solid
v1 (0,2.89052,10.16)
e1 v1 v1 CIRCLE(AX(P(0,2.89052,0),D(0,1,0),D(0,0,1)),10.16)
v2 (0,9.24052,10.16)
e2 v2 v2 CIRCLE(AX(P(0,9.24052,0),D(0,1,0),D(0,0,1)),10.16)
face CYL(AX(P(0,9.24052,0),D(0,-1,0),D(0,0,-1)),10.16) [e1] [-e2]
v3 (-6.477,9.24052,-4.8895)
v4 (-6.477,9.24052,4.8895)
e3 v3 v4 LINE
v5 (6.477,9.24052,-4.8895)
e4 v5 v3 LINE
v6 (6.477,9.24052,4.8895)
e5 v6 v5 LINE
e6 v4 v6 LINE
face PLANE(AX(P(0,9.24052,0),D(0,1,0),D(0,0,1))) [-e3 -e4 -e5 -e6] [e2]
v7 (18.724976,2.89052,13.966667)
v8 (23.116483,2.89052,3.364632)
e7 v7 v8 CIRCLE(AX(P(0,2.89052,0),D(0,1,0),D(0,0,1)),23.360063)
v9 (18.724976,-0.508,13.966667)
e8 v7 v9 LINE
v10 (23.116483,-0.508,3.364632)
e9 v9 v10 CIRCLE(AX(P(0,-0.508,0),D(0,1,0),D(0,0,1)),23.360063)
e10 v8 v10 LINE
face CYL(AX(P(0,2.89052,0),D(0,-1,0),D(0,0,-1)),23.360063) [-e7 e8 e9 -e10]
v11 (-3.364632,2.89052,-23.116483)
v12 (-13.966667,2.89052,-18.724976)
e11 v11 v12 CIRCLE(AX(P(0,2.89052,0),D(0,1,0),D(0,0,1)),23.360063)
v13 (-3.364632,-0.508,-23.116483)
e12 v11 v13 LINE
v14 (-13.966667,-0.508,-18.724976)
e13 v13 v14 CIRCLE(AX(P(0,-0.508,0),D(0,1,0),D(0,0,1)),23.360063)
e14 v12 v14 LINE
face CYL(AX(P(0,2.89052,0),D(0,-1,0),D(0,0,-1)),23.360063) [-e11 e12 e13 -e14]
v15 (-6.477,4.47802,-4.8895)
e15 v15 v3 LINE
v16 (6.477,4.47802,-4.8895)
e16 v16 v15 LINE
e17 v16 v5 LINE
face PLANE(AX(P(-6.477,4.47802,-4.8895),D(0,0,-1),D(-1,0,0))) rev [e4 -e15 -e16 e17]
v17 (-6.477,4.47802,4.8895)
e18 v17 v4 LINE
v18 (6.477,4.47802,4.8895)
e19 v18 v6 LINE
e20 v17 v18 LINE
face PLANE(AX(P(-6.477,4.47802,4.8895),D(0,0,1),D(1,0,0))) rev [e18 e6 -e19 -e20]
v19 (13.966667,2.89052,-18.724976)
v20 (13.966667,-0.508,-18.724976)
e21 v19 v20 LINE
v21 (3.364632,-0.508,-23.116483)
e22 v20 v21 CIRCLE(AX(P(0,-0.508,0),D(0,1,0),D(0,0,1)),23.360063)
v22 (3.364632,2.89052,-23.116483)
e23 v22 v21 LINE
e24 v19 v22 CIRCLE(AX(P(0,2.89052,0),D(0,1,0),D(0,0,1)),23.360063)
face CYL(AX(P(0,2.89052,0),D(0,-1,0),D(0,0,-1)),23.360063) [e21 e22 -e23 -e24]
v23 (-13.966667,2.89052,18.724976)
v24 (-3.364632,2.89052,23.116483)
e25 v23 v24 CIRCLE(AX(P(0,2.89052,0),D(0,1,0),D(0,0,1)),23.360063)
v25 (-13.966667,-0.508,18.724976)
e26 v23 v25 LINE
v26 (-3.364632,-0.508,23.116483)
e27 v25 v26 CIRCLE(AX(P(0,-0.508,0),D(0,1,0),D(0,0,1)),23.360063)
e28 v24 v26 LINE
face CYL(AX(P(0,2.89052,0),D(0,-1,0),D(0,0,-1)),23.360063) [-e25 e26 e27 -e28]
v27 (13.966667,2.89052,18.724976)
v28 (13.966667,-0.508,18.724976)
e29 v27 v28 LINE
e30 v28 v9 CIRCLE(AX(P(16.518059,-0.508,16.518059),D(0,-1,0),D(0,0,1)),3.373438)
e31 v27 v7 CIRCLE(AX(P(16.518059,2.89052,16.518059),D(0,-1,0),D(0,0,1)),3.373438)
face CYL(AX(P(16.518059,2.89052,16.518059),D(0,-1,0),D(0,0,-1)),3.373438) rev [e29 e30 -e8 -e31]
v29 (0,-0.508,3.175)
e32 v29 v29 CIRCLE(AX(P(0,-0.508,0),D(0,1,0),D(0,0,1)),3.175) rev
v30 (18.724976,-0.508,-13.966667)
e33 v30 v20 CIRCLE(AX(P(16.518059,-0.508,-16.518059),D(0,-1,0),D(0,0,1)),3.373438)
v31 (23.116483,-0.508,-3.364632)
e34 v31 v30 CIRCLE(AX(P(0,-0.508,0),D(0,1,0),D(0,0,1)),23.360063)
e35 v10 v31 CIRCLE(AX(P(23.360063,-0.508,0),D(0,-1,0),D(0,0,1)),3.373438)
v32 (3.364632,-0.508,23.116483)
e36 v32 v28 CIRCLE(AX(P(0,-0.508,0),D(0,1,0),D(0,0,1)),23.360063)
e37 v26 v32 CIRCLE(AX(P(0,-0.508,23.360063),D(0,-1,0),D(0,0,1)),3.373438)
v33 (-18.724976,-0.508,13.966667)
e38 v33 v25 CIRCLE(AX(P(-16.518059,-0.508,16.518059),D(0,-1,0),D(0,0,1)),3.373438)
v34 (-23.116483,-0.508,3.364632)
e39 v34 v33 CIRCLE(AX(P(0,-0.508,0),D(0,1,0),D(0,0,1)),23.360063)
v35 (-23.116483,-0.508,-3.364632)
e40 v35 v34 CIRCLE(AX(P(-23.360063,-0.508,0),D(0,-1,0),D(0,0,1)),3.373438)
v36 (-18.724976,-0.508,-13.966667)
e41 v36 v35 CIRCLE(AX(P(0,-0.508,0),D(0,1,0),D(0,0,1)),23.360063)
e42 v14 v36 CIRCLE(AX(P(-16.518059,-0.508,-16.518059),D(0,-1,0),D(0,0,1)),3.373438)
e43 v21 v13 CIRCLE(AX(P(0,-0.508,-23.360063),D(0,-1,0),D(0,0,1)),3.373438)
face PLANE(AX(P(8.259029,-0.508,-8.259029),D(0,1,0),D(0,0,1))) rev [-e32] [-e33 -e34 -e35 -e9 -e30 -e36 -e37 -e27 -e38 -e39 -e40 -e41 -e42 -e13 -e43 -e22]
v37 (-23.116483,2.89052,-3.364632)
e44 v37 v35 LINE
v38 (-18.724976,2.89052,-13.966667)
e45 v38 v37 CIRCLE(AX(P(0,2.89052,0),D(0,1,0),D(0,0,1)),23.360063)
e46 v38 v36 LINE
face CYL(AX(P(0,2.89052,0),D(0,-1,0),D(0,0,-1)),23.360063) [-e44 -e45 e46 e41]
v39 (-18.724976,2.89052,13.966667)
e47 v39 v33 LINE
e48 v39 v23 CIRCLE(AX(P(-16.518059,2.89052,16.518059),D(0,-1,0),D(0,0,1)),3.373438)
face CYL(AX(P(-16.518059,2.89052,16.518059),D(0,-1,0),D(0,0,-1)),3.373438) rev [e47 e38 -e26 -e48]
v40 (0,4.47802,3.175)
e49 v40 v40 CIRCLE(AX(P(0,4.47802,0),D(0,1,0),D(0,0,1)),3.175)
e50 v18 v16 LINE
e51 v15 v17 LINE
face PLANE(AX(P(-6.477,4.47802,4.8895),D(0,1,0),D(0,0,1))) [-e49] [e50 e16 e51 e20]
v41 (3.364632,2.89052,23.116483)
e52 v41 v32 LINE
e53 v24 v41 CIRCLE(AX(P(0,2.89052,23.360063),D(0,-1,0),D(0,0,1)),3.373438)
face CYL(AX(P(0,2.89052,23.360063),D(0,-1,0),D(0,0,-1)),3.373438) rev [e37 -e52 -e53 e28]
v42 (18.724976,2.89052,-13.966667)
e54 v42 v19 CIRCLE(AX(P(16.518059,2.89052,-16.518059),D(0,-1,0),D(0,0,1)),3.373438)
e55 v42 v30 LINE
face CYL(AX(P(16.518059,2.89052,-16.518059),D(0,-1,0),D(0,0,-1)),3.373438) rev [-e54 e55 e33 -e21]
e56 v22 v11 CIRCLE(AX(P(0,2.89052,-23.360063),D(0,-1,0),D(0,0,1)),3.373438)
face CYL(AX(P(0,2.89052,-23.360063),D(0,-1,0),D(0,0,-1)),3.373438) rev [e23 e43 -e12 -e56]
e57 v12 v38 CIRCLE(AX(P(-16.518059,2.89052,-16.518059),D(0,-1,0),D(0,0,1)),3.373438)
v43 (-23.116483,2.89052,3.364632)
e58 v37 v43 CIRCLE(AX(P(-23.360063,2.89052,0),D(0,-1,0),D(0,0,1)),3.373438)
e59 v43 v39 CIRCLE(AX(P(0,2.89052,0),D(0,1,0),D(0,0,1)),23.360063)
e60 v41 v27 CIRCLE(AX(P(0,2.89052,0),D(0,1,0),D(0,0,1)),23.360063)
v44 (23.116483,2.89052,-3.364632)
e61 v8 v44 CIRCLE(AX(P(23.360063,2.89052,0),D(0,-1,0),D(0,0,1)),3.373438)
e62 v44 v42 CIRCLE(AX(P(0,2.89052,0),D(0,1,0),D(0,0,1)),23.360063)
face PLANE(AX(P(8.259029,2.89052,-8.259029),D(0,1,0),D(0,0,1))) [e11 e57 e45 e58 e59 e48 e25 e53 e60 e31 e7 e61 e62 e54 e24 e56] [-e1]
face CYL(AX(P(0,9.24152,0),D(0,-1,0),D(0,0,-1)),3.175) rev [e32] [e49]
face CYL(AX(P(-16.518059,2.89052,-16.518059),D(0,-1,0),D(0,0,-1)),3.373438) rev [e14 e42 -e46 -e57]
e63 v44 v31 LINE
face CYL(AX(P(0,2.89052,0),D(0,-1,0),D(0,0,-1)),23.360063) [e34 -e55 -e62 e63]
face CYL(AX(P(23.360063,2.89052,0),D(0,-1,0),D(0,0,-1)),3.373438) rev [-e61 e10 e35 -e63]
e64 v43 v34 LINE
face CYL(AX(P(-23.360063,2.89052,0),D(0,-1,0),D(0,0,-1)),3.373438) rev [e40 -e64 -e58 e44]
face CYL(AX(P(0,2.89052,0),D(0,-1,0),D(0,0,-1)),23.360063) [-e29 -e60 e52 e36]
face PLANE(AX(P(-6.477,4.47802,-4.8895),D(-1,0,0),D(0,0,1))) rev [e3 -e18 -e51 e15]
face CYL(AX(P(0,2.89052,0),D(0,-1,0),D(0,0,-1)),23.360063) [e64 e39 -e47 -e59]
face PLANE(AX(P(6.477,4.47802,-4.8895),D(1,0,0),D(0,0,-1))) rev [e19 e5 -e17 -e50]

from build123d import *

# Parameters (mm, degrees)
EXTRUDE1_DEPTH      = 2.89052
EXTRUDE1_DEPTH_BACK = 0.508
SKETCH5_R           = 10.16
EXTRUDE2_DEPTH      = 6.35
CUT_EXTRUDE1_START  = -0.508
SKETCH3_R           = 3.175
CUT_EXTRUDE1_DEPTH  = 9.74852
SPLIT1_START        = -6.477
SPLIT1_OUTLINE_W    = 4.7625
SPLIT1_OUTLINE_H    = 9.779
SPLIT1_DEPTH        = 12.954


# Read off the part's stored shape, not the designer's step: Split1
with BuildPart() as part:
    # Sketch1 → Extrude1 (new, two sides: drawn at the far end of the back side and taken through both)
    with BuildSketch(Plane(origin=(0, 0, 0), x_dir=(1, 0, 0), z_dir=(0, 1, 0)).offset(-EXTRUDE1_DEPTH_BACK)):
        with BuildLine():
            ThreePointArc((-3.364632139, 23.11648266), (-8.939508898, 21.581883622), (-13.966667445, 18.724975848))
            ThreePointArc((-13.966667445, 18.724975848), (-14.132678071, 14.132678071), (-18.724975848, 13.966667445))
            ThreePointArc((-18.724975848, 13.966667445), (-21.581883622, 8.939508898), (-23.11648266, 3.364632139))
            ThreePointArc((-23.11648266, 3.364632139), (-19.986625, 0), (-23.11648266, -3.364632139))
            ThreePointArc((-23.11648266, -3.364632139), (-21.581883622, -8.939508898), (-18.724975848, -13.966667445))
            ThreePointArc((-18.724975848, -13.966667445), (-14.132678071, -14.132678071), (-13.966667445, -18.724975848))
            ThreePointArc((-13.966667445, -18.724975848), (-8.939508898, -21.581883622), (-3.364632139, -23.11648266))
            ThreePointArc((-3.364632139, -23.11648266), (0, -19.986625), (3.364632139, -23.11648266))
            ThreePointArc((3.364632139, -23.11648266), (8.939508898, -21.581883622), (13.966667445, -18.724975848))
            ThreePointArc((13.966667445, -18.724975848), (14.132678071, -14.132678071), (18.724975848, -13.966667445))
            ThreePointArc((18.724975848, -13.966667445), (21.581883622, -8.939508898), (23.11648266, -3.364632139))
            ThreePointArc((23.11648266, -3.364632139), (19.986625, 0), (23.11648266, 3.364632139))
            ThreePointArc((23.11648266, 3.364632139), (21.581883622, 8.939508898), (18.724975848, 13.966667445))
            ThreePointArc((18.724975848, 13.966667445), (14.132678071, 14.132678071), (13.966667445, 18.724975848))
            ThreePointArc((13.966667445, 18.724975848), (8.939508898, 21.581883622), (3.364632139, 23.11648266))
            ThreePointArc((3.364632139, 23.11648266), (0, 19.986625), (-3.364632139, 23.11648266))
        make_face()
    extrude(amount=EXTRUDE1_DEPTH + EXTRUDE1_DEPTH_BACK)

    # Sketch5 → Extrude2 (add)
    with BuildSketch(Plane(origin=(0, 2.89052, 0), x_dir=(-1, 0, 0), z_dir=(0, 1, 0))):
        with Locations(Location((0, 0, 0), (0, 0, 90))):
            Circle(SKETCH5_R)
    extrude(amount=EXTRUDE2_DEPTH)

    # Sketch3 → Cut-Extrude1 (cut)
    with BuildSketch(Plane(origin=(0, 0, 0), x_dir=(1, 0, 0), z_dir=(0, 1, 0)).offset(CUT_EXTRUDE1_START)):
        with Locations(Location((0, 0, 0), (0, 0, 270))):
            Circle(SKETCH3_R)
    extrude(amount=CUT_EXTRUDE1_DEPTH, mode=Mode.SUBTRACT)

    # Split1 outline → Split1 (cut)
    with BuildSketch(Plane.YZ.offset(SPLIT1_START)):
        with Locations((6.85927, 0)):
            Rectangle(SPLIT1_OUTLINE_W, SPLIT1_OUTLINE_H)
    extrude(amount=SPLIT1_DEPTH, mode=Mode.SUBTRACT)


solid = part.part
